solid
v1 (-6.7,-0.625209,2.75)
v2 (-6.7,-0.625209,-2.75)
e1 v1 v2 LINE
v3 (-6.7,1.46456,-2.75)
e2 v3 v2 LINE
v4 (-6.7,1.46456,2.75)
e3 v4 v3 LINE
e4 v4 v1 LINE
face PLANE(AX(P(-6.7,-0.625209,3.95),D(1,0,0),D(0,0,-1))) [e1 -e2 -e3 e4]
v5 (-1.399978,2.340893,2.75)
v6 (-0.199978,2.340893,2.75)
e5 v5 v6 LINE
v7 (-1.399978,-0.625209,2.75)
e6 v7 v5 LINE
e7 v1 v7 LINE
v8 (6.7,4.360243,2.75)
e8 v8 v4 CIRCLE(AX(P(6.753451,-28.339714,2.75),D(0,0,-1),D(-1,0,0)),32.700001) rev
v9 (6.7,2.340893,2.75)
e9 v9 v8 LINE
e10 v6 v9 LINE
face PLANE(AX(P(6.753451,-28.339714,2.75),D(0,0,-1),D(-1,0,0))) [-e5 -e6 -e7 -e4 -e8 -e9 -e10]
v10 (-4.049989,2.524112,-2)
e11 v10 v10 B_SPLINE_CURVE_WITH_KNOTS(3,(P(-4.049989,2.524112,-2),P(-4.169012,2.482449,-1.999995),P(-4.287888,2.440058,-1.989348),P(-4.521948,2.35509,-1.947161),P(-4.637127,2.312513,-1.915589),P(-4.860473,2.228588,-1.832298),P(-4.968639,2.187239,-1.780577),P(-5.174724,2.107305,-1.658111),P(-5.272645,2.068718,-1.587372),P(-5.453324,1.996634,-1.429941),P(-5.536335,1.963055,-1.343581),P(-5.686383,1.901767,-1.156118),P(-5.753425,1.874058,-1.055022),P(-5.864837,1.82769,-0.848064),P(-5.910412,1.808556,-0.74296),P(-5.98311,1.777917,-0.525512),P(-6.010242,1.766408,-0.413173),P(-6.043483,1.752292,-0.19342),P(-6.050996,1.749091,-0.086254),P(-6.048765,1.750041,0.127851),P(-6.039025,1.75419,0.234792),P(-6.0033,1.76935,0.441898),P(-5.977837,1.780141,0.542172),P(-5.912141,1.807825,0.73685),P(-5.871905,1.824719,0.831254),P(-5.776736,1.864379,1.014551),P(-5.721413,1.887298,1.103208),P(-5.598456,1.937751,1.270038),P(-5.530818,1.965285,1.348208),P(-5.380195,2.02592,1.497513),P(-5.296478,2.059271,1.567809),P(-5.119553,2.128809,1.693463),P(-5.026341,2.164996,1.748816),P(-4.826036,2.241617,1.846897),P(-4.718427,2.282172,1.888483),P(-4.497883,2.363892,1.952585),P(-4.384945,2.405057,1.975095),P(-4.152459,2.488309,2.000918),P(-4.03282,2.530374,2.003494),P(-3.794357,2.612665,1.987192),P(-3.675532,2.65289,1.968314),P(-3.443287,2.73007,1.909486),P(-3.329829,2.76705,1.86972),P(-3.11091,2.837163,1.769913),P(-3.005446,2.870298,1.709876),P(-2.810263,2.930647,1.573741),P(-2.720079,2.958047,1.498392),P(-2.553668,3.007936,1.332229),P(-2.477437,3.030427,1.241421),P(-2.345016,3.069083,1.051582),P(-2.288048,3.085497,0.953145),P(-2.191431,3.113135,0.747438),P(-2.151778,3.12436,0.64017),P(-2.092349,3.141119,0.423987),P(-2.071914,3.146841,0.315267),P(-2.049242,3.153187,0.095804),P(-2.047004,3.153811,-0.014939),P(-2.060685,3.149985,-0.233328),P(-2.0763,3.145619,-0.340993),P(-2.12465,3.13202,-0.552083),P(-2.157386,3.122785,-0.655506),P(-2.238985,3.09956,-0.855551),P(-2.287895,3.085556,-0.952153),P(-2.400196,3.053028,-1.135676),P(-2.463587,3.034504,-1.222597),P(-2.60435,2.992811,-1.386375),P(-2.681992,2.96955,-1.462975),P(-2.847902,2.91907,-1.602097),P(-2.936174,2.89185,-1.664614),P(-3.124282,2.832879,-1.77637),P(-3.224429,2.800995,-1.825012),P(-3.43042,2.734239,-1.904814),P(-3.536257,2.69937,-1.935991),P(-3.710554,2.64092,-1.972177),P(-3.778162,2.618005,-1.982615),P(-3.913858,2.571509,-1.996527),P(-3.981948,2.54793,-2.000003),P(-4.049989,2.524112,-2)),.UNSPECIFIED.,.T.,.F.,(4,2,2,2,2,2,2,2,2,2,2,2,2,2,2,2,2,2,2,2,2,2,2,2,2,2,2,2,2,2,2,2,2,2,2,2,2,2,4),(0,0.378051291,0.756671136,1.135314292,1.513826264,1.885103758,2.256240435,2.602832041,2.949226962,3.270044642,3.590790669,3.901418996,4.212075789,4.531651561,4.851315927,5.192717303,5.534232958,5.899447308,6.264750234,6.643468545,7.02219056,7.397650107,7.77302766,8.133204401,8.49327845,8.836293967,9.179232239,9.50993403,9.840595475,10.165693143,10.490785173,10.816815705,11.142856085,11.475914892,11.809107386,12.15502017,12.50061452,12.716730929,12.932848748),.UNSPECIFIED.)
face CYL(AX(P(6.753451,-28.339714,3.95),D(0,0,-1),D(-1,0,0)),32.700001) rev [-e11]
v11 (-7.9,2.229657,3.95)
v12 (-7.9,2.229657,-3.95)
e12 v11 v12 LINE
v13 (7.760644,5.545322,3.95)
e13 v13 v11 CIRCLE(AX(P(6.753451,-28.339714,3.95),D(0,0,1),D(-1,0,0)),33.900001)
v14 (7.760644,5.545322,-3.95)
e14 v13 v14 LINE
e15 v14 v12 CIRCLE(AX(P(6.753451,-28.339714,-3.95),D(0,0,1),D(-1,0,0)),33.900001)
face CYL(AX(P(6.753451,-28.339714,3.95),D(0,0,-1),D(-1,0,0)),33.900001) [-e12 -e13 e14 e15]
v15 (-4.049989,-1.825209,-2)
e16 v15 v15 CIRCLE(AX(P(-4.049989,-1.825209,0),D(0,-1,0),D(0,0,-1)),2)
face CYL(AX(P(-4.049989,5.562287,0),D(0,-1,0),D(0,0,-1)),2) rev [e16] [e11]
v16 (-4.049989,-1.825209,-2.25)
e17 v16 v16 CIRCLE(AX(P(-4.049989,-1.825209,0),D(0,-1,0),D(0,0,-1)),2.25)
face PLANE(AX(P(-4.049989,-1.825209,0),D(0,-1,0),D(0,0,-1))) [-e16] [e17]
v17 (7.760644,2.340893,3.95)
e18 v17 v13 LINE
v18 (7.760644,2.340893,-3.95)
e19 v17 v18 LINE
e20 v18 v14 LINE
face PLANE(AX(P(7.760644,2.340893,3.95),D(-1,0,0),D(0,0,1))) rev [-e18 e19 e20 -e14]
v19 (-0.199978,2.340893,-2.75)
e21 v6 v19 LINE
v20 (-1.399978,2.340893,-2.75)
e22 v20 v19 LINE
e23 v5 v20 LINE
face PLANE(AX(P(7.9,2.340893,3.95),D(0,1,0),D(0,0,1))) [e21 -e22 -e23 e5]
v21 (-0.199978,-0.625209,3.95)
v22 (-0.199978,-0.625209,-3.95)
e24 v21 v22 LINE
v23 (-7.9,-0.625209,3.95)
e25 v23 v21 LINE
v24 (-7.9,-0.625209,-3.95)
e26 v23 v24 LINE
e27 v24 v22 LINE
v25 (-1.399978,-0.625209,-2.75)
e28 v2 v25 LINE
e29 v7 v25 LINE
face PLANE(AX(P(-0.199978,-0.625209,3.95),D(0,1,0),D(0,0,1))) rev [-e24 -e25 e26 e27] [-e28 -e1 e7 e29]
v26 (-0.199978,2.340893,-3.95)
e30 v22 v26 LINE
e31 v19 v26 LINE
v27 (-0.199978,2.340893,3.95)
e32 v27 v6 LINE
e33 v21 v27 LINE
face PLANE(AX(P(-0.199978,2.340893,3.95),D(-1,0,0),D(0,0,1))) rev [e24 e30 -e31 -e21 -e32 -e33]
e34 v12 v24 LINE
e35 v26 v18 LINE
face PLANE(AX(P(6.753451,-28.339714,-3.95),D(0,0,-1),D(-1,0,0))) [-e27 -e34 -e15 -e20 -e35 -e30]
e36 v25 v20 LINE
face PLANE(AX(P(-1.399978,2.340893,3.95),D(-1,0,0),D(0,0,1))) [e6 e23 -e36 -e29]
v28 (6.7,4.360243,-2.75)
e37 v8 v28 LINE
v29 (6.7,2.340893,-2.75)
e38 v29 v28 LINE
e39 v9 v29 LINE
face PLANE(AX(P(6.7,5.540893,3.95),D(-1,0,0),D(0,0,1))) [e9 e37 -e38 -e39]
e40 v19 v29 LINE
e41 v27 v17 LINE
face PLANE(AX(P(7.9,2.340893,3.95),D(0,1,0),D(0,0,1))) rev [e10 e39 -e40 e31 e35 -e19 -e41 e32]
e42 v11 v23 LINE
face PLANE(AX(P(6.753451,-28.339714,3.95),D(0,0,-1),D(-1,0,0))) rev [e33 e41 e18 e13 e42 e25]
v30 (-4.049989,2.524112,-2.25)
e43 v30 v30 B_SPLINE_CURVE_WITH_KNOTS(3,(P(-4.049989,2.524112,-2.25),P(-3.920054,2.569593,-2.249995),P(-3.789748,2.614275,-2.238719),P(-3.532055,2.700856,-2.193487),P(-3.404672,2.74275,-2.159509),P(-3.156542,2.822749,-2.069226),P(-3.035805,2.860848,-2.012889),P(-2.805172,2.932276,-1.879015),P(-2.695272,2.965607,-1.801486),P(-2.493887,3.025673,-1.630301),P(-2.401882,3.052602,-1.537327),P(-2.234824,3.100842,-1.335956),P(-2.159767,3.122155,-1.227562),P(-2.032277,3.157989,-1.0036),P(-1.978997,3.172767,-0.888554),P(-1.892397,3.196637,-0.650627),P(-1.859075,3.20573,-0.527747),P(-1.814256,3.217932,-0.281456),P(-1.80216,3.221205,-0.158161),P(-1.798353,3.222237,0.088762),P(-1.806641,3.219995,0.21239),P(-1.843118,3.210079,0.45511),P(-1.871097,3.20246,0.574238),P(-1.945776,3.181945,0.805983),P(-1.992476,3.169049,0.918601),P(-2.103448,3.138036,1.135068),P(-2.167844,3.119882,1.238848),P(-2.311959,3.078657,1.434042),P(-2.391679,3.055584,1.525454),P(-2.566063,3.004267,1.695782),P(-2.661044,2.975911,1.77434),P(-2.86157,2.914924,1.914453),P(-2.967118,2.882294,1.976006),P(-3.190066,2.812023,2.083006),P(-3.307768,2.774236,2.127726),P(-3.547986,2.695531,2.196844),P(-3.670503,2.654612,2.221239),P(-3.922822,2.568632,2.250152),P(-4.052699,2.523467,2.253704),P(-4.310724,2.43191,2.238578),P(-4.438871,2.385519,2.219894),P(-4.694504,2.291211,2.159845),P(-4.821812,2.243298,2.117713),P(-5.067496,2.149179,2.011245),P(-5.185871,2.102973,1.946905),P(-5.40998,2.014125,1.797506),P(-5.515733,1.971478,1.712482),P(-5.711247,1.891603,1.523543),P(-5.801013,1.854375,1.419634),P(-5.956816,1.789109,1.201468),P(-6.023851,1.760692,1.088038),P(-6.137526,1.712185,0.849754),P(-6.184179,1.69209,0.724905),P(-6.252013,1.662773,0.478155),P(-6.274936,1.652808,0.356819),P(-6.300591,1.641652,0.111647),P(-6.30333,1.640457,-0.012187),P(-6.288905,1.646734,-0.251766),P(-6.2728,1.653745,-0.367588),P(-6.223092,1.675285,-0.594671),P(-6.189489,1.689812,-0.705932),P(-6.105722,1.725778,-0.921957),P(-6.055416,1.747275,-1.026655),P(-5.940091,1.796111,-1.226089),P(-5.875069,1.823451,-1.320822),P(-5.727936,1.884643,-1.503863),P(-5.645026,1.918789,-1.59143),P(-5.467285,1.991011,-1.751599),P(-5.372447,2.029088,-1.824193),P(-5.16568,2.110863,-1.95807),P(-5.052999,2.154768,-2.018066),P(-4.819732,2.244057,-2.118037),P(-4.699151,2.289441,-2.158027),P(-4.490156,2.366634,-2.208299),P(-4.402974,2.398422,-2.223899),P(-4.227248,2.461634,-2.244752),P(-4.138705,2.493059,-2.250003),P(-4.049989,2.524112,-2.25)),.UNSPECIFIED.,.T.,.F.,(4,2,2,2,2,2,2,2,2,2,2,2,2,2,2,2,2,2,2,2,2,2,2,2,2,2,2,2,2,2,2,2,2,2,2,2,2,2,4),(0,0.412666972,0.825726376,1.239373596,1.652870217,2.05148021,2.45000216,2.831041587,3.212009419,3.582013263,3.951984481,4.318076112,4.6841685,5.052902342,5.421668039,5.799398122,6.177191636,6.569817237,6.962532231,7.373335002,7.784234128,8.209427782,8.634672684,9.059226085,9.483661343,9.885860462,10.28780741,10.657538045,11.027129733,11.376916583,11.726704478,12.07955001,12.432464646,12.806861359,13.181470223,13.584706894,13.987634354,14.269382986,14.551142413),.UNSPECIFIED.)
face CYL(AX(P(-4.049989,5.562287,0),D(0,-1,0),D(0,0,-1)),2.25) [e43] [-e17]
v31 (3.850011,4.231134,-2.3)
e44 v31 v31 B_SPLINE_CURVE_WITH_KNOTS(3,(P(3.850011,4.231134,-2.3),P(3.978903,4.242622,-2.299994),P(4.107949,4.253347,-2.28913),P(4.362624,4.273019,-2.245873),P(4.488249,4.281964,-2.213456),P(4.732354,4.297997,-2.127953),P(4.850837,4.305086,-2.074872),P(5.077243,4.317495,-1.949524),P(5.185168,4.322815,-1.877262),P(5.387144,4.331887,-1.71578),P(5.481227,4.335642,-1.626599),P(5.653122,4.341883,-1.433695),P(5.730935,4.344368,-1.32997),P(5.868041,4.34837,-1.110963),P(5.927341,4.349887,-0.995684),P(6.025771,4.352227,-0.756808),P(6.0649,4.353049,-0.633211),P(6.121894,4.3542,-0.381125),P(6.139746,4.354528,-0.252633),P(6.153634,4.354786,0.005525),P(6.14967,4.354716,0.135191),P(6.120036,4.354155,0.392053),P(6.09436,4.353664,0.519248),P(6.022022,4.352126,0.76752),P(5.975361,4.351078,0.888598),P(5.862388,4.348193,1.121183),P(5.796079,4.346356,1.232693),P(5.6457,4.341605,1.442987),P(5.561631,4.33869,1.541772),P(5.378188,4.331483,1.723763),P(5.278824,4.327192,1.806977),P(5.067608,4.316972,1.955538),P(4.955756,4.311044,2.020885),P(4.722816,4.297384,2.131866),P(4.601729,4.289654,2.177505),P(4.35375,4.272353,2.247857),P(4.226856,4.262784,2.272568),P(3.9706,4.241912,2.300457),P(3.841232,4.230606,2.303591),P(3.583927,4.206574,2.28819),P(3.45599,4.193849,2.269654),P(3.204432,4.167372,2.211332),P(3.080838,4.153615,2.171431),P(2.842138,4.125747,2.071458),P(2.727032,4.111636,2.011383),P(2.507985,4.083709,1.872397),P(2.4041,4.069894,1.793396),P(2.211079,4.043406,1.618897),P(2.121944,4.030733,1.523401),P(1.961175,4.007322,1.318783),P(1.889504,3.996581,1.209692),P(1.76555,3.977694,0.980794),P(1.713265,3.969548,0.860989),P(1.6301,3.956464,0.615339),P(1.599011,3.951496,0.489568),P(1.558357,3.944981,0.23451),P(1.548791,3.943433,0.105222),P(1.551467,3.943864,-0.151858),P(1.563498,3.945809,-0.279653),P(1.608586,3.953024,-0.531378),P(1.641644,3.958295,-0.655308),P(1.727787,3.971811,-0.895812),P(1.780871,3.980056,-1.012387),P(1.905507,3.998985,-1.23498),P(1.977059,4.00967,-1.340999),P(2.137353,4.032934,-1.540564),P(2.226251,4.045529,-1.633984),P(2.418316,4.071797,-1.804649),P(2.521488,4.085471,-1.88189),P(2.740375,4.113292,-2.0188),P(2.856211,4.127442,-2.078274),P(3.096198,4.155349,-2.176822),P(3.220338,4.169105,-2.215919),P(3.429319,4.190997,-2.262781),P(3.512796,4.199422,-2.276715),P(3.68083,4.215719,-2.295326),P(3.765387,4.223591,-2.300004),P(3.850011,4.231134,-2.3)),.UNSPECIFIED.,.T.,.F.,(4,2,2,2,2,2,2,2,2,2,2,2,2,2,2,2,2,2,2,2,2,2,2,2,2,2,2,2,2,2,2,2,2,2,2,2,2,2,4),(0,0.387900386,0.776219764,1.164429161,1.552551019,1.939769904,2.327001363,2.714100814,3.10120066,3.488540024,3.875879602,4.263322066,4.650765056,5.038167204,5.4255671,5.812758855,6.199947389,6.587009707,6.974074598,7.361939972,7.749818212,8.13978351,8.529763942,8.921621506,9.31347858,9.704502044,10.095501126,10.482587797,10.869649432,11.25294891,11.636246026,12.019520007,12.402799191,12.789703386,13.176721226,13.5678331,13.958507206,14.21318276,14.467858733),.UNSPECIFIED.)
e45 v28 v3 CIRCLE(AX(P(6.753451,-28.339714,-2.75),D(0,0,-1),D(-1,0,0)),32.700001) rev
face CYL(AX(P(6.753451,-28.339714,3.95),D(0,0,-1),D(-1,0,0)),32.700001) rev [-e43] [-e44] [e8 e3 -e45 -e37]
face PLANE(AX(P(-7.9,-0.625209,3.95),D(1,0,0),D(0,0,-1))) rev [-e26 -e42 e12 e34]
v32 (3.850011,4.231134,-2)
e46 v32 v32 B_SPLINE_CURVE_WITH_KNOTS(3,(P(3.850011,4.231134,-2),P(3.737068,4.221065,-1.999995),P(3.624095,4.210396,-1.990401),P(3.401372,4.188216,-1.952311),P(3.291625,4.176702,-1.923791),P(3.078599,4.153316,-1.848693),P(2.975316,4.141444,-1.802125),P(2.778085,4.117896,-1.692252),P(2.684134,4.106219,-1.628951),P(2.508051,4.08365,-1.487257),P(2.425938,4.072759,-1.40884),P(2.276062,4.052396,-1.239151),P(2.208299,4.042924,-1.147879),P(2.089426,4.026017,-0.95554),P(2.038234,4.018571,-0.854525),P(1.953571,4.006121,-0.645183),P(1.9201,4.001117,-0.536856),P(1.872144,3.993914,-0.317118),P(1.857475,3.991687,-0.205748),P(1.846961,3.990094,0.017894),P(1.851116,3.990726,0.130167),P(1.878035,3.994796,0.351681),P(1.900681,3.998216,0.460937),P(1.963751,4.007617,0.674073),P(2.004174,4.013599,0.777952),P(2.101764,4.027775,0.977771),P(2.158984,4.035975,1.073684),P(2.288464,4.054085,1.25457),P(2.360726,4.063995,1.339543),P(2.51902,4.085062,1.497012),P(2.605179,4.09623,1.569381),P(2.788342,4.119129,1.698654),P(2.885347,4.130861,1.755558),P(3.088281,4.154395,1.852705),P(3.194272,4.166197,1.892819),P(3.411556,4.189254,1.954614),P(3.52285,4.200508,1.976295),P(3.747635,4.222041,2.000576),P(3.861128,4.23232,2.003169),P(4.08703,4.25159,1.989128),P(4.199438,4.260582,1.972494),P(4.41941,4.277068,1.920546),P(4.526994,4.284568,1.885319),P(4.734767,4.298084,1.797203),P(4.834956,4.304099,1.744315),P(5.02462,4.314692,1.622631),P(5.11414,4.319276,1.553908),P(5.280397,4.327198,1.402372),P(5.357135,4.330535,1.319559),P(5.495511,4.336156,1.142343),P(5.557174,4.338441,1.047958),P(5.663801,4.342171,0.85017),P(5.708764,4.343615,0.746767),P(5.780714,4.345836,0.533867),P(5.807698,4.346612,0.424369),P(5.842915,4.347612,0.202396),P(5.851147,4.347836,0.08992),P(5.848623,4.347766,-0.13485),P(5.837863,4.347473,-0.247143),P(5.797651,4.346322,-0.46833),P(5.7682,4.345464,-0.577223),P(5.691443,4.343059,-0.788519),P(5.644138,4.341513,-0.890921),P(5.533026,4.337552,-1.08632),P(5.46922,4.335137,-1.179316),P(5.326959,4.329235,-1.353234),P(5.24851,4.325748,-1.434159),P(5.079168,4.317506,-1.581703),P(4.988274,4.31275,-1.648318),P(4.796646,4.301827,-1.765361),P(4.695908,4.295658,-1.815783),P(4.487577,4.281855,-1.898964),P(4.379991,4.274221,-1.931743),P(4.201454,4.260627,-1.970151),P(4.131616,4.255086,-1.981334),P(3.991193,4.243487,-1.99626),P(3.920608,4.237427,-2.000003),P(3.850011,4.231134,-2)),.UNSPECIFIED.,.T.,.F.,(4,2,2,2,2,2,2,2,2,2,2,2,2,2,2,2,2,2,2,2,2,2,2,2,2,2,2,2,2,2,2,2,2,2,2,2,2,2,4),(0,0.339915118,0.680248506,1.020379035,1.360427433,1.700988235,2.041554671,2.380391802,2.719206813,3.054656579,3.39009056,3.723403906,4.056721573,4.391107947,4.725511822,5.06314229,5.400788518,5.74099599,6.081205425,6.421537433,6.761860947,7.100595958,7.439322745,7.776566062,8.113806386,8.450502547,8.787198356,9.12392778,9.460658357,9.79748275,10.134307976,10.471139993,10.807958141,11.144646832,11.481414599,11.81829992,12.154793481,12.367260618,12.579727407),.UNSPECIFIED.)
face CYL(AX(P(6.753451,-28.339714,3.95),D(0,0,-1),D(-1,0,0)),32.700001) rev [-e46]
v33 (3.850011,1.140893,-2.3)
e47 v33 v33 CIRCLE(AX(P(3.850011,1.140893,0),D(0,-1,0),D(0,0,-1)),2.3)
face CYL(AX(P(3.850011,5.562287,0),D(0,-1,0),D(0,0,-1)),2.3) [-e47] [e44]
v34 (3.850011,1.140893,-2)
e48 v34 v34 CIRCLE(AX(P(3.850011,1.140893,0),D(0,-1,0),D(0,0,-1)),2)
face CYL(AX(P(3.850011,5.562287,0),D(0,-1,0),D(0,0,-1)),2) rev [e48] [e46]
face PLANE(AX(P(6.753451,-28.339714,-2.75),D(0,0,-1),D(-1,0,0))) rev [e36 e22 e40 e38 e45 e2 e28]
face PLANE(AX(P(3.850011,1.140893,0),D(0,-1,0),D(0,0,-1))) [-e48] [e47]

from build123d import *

# Parameters (mm, degrees)
BOSS_EXTRUDE1_DEPTH      = 3.95
SHELL1_START             = -2.75
SHELL1_DEPTH             = 5.5
BOSS_EXTRUDE2_REACH      = 12.601
BOSS_EXTRUDE2_END_RADIUS = 32.700000868
BOSS_EXTRUDE2_START      = 1.2
SKETCH8_R                = 2.3
SKETCH8_R_2              = 2
BOSS_EXTRUDE3_REACH      = 13.983
BOSS_EXTRUDE3_END_RADIUS = 32.700000868
BOSS_EXTRUDE3_START      = 1.2
SKETCH9_R                = 2.25
SKETCH9_R_2              = 2
CUT_EXTRUDE5_DEPTH       = 13.479454835


# Read off the part's stored shape, not the designer's step: Shell1
with BuildPart() as part:
    # Sketch1 → Boss-Extrude1 (new, symmetric)
    with BuildSketch(Plane.XY):
        with BuildLine():
            Line((-7.9, -0.625209461), (-7.9, 2.229657062))
            ThreePointArc((-7.9, 2.229657062), (-0.19997769, 4.839494926), (7.9, 5.540892579))
            Line((7.9, 5.540892579), (7.9, 2.340892579))
            Line((7.9, 2.340892579), (-0.19997769, 2.340892579))
            Line((-0.19997769, 2.340892579), (-0.19997769, -0.625209461))
            Line((-0.19997769, -0.625209461), (-7.9, -0.625209461))
        make_face()
    extrude(amount=BOSS_EXTRUDE1_DEPTH, both=True)

    # Shell1 outline → Shell1 (cut)
    with BuildSketch(Plane.XY.offset(SHELL1_START)):
        with BuildLine():
            Line((-1.39997769, 2.340892579), (6.7, 2.340892579))
            Line((6.7, 2.340892579), (6.7, 4.360243445))
            ThreePointArc((6.7, 4.360243445), (-0.153454716, 3.622525068), (-6.7, 1.464559639))
            Line((-6.7, 1.464559639), (-6.7, -0.625209461))
            Line((-6.7, -0.625209461), (-1.39997769, -0.625209461))
            Line((-1.39997769, -0.625209461), (-1.39997769, 2.340892579))
        make_face()
    extrude(amount=SHELL1_DEPTH, mode=Mode.SUBTRACT)

    # Boss-Extrude2: up to this cylinder (the profile starts inside it)
    boss_extrude2_end = Plane(origin=(6.753451055, -28.339713738, 2.234946), z_dir=(0, 0, -1)) * Cylinder(BOSS_EXTRUDE2_END_RADIUS, 91.602001737, mode=Mode.PRIVATE)
    # Sketch8 → Boss-Extrude2 (add, up to the surface)
    with BuildSketch(Plane(origin=(0, 2.340892579, 0), x_dir=(-1, 0, 0), z_dir=(0, -1, 0)).offset(BOSS_EXTRUDE2_START), mode=Mode.PRIVATE) as boss_extrude2_sk1:
        with Locations(Location((-3.850011155, 0, 0), (0, 0, 90))):
            Circle(SKETCH8_R)
        with Locations(Location((-3.850011155, 0, 0), (0, 0, 90))):
            Circle(SKETCH8_R_2, mode=Mode.SUBTRACT)
    boss_extrude2_tool1 = extrude(boss_extrude2_sk1.sketch, amount=-BOSS_EXTRUDE2_REACH, mode=Mode.PRIVATE) & boss_extrude2_end
    add(boss_extrude2_tool1.solids().sort_by_distance((3.850011, 1.140893, 2.234946))[0])

    # Boss-Extrude3: up to this cylinder (the profile starts inside it)
    boss_extrude3_end = Plane(origin=(6.753451055, -28.339713738, 2.18636), z_dir=(0, 0, -1)) * Cylinder(BOSS_EXTRUDE3_END_RADIUS, 94.366001737, mode=Mode.PRIVATE)
    # Sketch9 → Boss-Extrude3 (add, up to the surface)
    with BuildSketch(Plane(origin=(0, -0.625209461, 0), x_dir=(-1, 0, 0), z_dir=(0, -1, 0)).offset(BOSS_EXTRUDE3_START), mode=Mode.PRIVATE) as boss_extrude3_sk1:
        with Locations(Location((4.049988845, 0, 0), (0, 0, 90))):
            Circle(SKETCH9_R)
        with Locations(Location((4.049988845, 0, 0), (0, 0, 90))):
            Circle(SKETCH9_R_2, mode=Mode.SUBTRACT)
    boss_extrude3_tool1 = extrude(boss_extrude3_sk1.sketch, amount=-BOSS_EXTRUDE3_REACH, mode=Mode.PRIVATE) & boss_extrude3_end
    add(boss_extrude3_tool1.solids().sort_by_distance((-4.049989, -1.825209, 2.18636))[0])

    # Sketch10 → Cut-Extrude5 (cut, through all)
    with BuildSketch(Plane(origin=(0, 0, -3.95), x_dir=(-1, 0, 0), z_dir=(0, 0, -1))):
        Polygon((-7.9, 2.340892579), (-7.760644151, 2.340892579), (-7.760644151, 5.545321616), (-7.9, 5.540892579), align=None)
    extrude(amount=-CUT_EXTRUDE5_DEPTH, mode=Mode.SUBTRACT)


with BuildPart() as cut_extrude5_kept_piece:
    # of the separate pieces the step leaves, the one the design keeps (cut_extrude5_pieces_kept)
    add(part.part.solids().sort_by_distance((-7.9, -0.625209461, -3.95))[0])


solid = cut_extrude5_kept_piece.part
